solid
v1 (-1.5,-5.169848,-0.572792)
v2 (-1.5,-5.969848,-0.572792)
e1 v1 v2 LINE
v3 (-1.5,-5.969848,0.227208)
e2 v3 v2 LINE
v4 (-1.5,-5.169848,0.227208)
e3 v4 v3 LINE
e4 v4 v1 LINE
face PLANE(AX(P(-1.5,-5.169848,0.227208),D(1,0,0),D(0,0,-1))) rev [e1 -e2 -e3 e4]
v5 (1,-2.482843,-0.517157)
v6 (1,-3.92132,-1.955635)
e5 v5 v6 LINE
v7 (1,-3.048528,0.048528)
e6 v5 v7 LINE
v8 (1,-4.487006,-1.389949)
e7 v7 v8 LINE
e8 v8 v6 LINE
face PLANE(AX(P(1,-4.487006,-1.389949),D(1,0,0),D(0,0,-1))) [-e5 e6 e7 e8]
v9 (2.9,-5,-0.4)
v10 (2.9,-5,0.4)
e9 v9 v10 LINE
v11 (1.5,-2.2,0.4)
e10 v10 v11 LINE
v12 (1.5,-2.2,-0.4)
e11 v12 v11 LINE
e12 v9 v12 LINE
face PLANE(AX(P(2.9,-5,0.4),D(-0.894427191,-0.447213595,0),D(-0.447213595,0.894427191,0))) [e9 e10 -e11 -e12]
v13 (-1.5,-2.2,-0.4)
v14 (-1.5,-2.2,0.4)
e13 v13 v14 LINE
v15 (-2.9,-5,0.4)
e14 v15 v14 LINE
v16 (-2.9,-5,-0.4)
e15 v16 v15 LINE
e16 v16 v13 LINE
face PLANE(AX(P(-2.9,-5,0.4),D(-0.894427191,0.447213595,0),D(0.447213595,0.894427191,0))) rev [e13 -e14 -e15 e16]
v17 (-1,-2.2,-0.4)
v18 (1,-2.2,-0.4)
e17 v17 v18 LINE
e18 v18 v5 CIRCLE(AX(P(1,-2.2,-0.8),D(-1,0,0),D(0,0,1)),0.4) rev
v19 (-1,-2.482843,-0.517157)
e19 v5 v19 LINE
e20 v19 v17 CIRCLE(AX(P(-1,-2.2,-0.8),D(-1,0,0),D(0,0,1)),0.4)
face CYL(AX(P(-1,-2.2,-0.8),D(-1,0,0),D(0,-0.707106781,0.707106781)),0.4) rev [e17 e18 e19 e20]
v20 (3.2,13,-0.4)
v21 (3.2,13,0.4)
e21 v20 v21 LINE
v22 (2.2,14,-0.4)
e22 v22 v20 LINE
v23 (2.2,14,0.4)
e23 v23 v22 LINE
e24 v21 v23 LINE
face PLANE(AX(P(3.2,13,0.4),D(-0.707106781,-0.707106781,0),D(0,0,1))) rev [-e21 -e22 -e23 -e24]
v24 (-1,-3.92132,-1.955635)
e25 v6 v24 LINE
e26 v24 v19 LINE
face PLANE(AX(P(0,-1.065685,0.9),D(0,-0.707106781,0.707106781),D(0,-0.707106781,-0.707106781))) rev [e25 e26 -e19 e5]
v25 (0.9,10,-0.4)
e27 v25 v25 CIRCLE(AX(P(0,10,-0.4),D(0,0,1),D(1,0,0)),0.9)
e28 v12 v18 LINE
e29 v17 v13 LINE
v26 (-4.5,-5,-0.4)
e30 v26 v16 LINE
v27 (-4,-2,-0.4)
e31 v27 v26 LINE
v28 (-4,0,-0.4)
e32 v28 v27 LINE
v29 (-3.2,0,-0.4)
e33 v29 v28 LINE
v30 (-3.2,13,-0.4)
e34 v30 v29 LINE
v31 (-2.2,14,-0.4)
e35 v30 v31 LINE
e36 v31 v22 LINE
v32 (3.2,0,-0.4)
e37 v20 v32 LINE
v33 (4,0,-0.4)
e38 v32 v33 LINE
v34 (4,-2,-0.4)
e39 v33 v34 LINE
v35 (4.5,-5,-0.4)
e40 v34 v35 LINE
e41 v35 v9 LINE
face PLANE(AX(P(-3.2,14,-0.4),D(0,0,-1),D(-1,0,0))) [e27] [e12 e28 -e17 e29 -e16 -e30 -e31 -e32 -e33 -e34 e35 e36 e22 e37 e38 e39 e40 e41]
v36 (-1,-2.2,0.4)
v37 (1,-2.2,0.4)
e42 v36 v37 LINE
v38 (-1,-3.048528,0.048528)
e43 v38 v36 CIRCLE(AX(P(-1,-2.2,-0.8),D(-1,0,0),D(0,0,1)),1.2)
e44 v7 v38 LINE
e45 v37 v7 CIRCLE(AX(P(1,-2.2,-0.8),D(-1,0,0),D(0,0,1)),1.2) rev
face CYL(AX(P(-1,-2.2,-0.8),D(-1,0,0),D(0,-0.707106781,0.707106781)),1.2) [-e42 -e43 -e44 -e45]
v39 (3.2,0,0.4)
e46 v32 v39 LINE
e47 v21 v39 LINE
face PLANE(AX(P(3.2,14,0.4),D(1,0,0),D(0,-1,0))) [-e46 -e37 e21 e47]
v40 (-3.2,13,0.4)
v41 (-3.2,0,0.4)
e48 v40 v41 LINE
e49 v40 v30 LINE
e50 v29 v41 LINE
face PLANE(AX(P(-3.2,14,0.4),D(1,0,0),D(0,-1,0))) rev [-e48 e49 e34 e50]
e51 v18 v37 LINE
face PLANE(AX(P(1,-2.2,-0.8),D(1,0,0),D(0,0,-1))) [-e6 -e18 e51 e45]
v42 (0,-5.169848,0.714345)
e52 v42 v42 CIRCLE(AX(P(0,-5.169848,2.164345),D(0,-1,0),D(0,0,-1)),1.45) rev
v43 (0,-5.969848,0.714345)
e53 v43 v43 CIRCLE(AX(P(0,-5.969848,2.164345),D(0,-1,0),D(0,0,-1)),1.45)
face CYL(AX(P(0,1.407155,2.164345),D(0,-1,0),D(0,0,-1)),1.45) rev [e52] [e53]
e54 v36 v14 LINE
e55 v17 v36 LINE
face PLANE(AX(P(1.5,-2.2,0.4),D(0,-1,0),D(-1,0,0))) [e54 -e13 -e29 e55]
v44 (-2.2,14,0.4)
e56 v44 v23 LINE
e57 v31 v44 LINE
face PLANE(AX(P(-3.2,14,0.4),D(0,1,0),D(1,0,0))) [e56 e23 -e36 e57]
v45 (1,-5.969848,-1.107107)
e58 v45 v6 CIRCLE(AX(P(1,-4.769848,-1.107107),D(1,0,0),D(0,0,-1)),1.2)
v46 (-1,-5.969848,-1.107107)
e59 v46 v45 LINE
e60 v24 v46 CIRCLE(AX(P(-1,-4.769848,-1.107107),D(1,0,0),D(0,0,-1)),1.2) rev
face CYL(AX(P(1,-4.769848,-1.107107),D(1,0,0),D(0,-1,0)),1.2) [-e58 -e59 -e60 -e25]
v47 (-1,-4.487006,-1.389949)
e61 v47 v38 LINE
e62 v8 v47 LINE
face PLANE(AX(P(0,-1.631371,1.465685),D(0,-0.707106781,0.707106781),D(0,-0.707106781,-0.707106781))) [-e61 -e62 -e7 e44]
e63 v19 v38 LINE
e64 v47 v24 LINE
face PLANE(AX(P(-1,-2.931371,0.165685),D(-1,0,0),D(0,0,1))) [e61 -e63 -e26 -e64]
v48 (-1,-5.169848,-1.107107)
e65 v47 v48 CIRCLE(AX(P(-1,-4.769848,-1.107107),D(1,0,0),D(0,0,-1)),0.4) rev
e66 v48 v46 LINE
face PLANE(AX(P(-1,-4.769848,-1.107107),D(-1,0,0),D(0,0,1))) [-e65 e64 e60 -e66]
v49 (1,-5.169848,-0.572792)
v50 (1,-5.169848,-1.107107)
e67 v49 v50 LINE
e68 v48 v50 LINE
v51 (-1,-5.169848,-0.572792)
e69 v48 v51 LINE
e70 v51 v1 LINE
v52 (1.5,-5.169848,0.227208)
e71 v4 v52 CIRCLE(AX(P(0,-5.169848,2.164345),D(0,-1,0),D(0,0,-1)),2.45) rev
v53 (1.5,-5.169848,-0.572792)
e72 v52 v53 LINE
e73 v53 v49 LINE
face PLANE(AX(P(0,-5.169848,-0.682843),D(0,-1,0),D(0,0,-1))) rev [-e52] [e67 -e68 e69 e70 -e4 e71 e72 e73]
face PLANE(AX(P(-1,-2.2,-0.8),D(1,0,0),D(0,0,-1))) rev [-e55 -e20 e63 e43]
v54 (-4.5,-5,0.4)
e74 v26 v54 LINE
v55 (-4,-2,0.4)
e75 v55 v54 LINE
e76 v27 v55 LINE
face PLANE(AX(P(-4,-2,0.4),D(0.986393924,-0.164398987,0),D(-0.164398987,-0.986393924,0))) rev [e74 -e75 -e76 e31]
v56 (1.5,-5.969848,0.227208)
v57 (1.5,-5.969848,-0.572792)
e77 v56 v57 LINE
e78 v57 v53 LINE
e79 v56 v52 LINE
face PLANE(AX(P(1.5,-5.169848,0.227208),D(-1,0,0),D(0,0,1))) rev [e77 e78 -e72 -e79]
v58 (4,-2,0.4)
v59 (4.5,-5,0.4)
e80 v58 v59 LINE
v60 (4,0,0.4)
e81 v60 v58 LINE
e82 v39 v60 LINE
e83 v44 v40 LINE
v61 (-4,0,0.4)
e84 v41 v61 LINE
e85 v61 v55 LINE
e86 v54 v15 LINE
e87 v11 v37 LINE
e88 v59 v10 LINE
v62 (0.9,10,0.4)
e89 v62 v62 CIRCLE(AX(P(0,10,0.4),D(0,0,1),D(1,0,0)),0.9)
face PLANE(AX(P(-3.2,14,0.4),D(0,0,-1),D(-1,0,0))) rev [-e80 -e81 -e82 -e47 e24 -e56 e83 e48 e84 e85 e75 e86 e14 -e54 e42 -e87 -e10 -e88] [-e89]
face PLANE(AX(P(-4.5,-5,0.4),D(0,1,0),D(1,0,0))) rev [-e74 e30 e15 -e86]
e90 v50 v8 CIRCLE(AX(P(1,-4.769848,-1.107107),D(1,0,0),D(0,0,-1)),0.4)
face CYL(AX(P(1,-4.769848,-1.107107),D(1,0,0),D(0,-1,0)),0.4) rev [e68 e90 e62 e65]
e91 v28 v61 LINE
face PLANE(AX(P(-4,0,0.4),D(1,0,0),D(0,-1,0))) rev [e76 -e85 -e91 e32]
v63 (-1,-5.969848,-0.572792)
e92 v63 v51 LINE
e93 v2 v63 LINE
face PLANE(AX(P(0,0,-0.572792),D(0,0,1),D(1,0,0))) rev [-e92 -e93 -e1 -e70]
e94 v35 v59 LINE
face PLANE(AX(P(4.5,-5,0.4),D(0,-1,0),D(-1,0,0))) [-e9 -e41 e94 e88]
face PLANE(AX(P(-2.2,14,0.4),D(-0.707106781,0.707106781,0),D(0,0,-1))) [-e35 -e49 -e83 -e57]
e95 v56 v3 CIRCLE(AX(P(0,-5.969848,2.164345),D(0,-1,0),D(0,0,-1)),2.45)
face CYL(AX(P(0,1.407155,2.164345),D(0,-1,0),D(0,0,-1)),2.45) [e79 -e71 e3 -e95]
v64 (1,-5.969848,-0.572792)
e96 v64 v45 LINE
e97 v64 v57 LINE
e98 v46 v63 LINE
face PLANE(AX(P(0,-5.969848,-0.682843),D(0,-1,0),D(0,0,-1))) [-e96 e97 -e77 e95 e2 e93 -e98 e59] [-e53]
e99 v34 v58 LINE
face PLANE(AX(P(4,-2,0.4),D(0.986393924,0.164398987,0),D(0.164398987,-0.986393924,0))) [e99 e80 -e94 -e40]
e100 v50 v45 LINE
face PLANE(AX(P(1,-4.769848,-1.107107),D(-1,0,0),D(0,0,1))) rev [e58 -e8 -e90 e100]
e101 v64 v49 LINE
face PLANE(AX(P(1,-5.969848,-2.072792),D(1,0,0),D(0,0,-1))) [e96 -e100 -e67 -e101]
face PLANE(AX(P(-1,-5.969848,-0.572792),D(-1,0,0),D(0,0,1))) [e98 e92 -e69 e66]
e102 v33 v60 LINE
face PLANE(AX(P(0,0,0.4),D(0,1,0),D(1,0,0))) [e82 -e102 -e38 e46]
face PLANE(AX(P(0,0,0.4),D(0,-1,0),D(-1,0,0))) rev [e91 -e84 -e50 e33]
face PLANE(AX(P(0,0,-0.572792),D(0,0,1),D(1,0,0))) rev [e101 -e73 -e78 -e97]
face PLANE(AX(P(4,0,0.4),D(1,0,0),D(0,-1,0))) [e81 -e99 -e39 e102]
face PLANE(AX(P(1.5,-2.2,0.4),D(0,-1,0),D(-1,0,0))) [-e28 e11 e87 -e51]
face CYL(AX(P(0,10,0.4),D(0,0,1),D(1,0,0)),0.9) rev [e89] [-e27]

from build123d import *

# Parameters (mm, degrees)
MAINBODYS_W                           = 6.4
MAINBODYS_H                           = 0.8
MAIN_BODY_DEPTH                       = 14
BOTTOM_OF_MAIN_BODY_REACH             = 16.367
BOTTOM_OF_MAIN_BODY_DIRECTION_2_REACH = 16.367
TOPHOLES_R                            = 0.9
TOP_HOLE_DEPTH                        = 15.727185746
F_45_DEGREE_FLANGE_DEPTH              = 2
BOTTOM_FLAT_FLANGE_DEPTH              = 2
EXTENDEDBOTTOMFLANGES_W               = 3
EXTENDEDBOTTOMFLANGES_H               = 0.8
EXTENDED_BOTTOM_FLANGE_DEPTH          = 0.8
BOSSEDCYLINDERBODYS_R                 = 1.45
BOSSED_CYLINDER_BODY_DEPTH            = 0.8
C_MAIN_BODY_SIZE                      = 1


# Sheet-metal steps are written as plain solids
with BuildPart() as part:
    # MainBodyS → MAIN BODY (new body)
    with BuildSketch(Plane(origin=(0, 0, 0), x_dir=(1, 0, 0), z_dir=(0, 1, 0))):
        Rectangle(MAINBODYS_W, MAINBODYS_H)
    extrude(amount=MAIN_BODY_DEPTH)

    # BOTTOM OF MAIN BODY: up to this face of the body (flat: up to its plane)
    bottom_of_main_body_end = Plane(part.part.faces().sort_by_distance((0, 7, 0.4))[0])
    # BottomMainBodyS → BOTTOM OF MAIN BODY (add, up to the picked face)
    with BuildSketch(Plane.XY, mode=Mode.PRIVATE) as bottom_of_main_body_sk1:
        Polygon((0, 0), (4, 0), (4, -2), (4.5, -5), (2.9, -5), (1.5, -2.2), (0, -2.2), align=None)
    bottom_of_main_body_tool1 = split(extrude(bottom_of_main_body_sk1.sketch, amount=BOTTOM_OF_MAIN_BODY_REACH, mode=Mode.PRIVATE), bisect_by=bottom_of_main_body_end, keep=Keep.BOTH, mode=Mode.PRIVATE)
    bottom_of_main_body = bottom_of_main_body_tool1.solids().sort_by(Axis((2.475691, -2.049989, 0), (0, 0, 1)))[0]
    add(bottom_of_main_body)

    # BOTTOM OF MAIN BODY direction 2: up to this face of the body (flat: up to its plane)
    bottom_of_main_body_direction_2_end = Plane(part.part.faces().sort_by_distance((0, 7, -0.4))[0])
    # BottomMainBodyS → BOTTOM OF MAIN BODY direction 2 (add, up to the picked face)
    with BuildSketch(Plane.XY, mode=Mode.PRIVATE) as bottom_of_main_body_direction_2_sk1:
        Polygon((0, 0), (4, 0), (4, -2), (4.5, -5), (2.9, -5), (1.5, -2.2), (0, -2.2), align=None)
    bottom_of_main_body_direction_2_tool1 = split(extrude(bottom_of_main_body_direction_2_sk1.sketch, amount=-BOTTOM_OF_MAIN_BODY_DIRECTION_2_REACH, mode=Mode.PRIVATE), bisect_by=bottom_of_main_body_direction_2_end, keep=Keep.BOTH, mode=Mode.PRIVATE)
    bottom_of_main_body_direction_2 = bottom_of_main_body_direction_2_tool1.solids().sort_by(Axis((2.475691, -2.049989, 0), (0, 0, -1)))[0]
    add(bottom_of_main_body_direction_2)

    # BMB HM: BOTTOM OF MAIN BODY, BOTTOM OF MAIN BODY direction 2 across plane
    add(bottom_of_main_body.mirror(Plane(origin=(0, 0, 0), x_dir=(0, 0, 1), z_dir=(1, 0, 0))))
    add(bottom_of_main_body_direction_2.mirror(Plane(origin=(0, 0, 0), x_dir=(0, 0, 1), z_dir=(1, 0, 0))))

    # TopHoleS → TOP HOLE (cut, through all)
    with BuildSketch(Plane.XY.offset(0.4)):
        with Locations((0, 10)):
            Circle(TOPHOLES_R)
    extrude(amount=-TOP_HOLE_DEPTH, mode=Mode.SUBTRACT)

    # 45 DEGREE FLANGE section (across the edge) → 45 DEGREE FLANGE (add)
    with BuildSketch(Plane(origin=(1, -2.365685425, -0.4), x_dir=(0, 0.7071067811865438, -0.7071067811865512), z_dir=(-1, 0, 0))):
        with BuildLine():
            Line((-0.8, 0.165685425), (-0.8, 2.2))
            Line((-0.8, 2.2), (0, 2.2))
            Line((0, 2.2), (0, 0.165685425))
            ThreePointArc((0, 0.165685425), (0.030448187, 0.012612052), (0.117157288, -0.117157288))
            Line((0.117157288, -0.117157288), (-0.448528137, -0.682842712))
            ThreePointArc((-0.448528137, -0.682842712), (-0.708655439, -0.293534694), (-0.8, 0.165685425))
        make_face()
    extrude(amount=F_45_DEGREE_FLANGE_DEPTH)

    # BOTTOM FLAT FLANGE section (across the edge) → BOTTOM FLAT FLANGE (add)
    with BuildSketch(Plane(origin=(-1, -5.169848481, -2.072792206), x_dir=(0, 1, 0), z_dir=(1, 0, 0))):
        with BuildLine():
            Line((-0.8, 0.965685425), (-0.8, 1.5))
            Line((-0.8, 1.5), (0, 1.5))
            Line((0, 1.5), (0, 0.965685425))
            ThreePointArc((0, 0.965685425), (0.246926627, 0.596133612), (0.682842712, 0.682842712))
            Line((0.682842712, 0.682842712), (1.248528137, 0.117157288))
            ThreePointArc((1.248528137, 0.117157288), (-0.059220119, -0.142970014), (-0.8, 0.965685425))
        make_face()
    extrude(amount=BOTTOM_FLAT_FLANGE_DEPTH)

    # ExtendedBottomFlangeS → EXTENDED BOTTOM FLANGE (add)
    with BuildSketch(Plane.XY.offset(-0.572792206)):
        with Locations((0, -5.569848481)):
            Rectangle(EXTENDEDBOTTOMFLANGES_W, EXTENDEDBOTTOMFLANGES_H)
    extrude(amount=EXTENDED_BOTTOM_FLANGE_DEPTH)

    # BossedCylinderBodyS → BOSSED  CYLINDER BODY (add)
    with BuildSketch(Plane.XZ.offset(5.969848481)):
        with BuildLine():
            Line((-1.5, 0.227207794), (1.5, 0.227207794))
            ThreePointArc((1.5, 0.227207794), (0, 4.614344857), (-1.5, 0.227207794))
        make_face()
        with Locations(Location((0, 2.164344857, 0), (0, 0, 270))):
            Circle(BOSSEDCYLINDERBODYS_R, mode=Mode.SUBTRACT)
    extrude(amount=-BOSSED_CYLINDER_BODY_DEPTH)

    # C MAIN BODY
    c_main_body_edges = [part.edges().sort_by_distance(p)[0] for p in [
        (-3.2, 14, 0),
        (3.2, 14, 0),
    ]]
    chamfer(c_main_body_edges, length=C_MAIN_BODY_SIZE)


solid = part.part
